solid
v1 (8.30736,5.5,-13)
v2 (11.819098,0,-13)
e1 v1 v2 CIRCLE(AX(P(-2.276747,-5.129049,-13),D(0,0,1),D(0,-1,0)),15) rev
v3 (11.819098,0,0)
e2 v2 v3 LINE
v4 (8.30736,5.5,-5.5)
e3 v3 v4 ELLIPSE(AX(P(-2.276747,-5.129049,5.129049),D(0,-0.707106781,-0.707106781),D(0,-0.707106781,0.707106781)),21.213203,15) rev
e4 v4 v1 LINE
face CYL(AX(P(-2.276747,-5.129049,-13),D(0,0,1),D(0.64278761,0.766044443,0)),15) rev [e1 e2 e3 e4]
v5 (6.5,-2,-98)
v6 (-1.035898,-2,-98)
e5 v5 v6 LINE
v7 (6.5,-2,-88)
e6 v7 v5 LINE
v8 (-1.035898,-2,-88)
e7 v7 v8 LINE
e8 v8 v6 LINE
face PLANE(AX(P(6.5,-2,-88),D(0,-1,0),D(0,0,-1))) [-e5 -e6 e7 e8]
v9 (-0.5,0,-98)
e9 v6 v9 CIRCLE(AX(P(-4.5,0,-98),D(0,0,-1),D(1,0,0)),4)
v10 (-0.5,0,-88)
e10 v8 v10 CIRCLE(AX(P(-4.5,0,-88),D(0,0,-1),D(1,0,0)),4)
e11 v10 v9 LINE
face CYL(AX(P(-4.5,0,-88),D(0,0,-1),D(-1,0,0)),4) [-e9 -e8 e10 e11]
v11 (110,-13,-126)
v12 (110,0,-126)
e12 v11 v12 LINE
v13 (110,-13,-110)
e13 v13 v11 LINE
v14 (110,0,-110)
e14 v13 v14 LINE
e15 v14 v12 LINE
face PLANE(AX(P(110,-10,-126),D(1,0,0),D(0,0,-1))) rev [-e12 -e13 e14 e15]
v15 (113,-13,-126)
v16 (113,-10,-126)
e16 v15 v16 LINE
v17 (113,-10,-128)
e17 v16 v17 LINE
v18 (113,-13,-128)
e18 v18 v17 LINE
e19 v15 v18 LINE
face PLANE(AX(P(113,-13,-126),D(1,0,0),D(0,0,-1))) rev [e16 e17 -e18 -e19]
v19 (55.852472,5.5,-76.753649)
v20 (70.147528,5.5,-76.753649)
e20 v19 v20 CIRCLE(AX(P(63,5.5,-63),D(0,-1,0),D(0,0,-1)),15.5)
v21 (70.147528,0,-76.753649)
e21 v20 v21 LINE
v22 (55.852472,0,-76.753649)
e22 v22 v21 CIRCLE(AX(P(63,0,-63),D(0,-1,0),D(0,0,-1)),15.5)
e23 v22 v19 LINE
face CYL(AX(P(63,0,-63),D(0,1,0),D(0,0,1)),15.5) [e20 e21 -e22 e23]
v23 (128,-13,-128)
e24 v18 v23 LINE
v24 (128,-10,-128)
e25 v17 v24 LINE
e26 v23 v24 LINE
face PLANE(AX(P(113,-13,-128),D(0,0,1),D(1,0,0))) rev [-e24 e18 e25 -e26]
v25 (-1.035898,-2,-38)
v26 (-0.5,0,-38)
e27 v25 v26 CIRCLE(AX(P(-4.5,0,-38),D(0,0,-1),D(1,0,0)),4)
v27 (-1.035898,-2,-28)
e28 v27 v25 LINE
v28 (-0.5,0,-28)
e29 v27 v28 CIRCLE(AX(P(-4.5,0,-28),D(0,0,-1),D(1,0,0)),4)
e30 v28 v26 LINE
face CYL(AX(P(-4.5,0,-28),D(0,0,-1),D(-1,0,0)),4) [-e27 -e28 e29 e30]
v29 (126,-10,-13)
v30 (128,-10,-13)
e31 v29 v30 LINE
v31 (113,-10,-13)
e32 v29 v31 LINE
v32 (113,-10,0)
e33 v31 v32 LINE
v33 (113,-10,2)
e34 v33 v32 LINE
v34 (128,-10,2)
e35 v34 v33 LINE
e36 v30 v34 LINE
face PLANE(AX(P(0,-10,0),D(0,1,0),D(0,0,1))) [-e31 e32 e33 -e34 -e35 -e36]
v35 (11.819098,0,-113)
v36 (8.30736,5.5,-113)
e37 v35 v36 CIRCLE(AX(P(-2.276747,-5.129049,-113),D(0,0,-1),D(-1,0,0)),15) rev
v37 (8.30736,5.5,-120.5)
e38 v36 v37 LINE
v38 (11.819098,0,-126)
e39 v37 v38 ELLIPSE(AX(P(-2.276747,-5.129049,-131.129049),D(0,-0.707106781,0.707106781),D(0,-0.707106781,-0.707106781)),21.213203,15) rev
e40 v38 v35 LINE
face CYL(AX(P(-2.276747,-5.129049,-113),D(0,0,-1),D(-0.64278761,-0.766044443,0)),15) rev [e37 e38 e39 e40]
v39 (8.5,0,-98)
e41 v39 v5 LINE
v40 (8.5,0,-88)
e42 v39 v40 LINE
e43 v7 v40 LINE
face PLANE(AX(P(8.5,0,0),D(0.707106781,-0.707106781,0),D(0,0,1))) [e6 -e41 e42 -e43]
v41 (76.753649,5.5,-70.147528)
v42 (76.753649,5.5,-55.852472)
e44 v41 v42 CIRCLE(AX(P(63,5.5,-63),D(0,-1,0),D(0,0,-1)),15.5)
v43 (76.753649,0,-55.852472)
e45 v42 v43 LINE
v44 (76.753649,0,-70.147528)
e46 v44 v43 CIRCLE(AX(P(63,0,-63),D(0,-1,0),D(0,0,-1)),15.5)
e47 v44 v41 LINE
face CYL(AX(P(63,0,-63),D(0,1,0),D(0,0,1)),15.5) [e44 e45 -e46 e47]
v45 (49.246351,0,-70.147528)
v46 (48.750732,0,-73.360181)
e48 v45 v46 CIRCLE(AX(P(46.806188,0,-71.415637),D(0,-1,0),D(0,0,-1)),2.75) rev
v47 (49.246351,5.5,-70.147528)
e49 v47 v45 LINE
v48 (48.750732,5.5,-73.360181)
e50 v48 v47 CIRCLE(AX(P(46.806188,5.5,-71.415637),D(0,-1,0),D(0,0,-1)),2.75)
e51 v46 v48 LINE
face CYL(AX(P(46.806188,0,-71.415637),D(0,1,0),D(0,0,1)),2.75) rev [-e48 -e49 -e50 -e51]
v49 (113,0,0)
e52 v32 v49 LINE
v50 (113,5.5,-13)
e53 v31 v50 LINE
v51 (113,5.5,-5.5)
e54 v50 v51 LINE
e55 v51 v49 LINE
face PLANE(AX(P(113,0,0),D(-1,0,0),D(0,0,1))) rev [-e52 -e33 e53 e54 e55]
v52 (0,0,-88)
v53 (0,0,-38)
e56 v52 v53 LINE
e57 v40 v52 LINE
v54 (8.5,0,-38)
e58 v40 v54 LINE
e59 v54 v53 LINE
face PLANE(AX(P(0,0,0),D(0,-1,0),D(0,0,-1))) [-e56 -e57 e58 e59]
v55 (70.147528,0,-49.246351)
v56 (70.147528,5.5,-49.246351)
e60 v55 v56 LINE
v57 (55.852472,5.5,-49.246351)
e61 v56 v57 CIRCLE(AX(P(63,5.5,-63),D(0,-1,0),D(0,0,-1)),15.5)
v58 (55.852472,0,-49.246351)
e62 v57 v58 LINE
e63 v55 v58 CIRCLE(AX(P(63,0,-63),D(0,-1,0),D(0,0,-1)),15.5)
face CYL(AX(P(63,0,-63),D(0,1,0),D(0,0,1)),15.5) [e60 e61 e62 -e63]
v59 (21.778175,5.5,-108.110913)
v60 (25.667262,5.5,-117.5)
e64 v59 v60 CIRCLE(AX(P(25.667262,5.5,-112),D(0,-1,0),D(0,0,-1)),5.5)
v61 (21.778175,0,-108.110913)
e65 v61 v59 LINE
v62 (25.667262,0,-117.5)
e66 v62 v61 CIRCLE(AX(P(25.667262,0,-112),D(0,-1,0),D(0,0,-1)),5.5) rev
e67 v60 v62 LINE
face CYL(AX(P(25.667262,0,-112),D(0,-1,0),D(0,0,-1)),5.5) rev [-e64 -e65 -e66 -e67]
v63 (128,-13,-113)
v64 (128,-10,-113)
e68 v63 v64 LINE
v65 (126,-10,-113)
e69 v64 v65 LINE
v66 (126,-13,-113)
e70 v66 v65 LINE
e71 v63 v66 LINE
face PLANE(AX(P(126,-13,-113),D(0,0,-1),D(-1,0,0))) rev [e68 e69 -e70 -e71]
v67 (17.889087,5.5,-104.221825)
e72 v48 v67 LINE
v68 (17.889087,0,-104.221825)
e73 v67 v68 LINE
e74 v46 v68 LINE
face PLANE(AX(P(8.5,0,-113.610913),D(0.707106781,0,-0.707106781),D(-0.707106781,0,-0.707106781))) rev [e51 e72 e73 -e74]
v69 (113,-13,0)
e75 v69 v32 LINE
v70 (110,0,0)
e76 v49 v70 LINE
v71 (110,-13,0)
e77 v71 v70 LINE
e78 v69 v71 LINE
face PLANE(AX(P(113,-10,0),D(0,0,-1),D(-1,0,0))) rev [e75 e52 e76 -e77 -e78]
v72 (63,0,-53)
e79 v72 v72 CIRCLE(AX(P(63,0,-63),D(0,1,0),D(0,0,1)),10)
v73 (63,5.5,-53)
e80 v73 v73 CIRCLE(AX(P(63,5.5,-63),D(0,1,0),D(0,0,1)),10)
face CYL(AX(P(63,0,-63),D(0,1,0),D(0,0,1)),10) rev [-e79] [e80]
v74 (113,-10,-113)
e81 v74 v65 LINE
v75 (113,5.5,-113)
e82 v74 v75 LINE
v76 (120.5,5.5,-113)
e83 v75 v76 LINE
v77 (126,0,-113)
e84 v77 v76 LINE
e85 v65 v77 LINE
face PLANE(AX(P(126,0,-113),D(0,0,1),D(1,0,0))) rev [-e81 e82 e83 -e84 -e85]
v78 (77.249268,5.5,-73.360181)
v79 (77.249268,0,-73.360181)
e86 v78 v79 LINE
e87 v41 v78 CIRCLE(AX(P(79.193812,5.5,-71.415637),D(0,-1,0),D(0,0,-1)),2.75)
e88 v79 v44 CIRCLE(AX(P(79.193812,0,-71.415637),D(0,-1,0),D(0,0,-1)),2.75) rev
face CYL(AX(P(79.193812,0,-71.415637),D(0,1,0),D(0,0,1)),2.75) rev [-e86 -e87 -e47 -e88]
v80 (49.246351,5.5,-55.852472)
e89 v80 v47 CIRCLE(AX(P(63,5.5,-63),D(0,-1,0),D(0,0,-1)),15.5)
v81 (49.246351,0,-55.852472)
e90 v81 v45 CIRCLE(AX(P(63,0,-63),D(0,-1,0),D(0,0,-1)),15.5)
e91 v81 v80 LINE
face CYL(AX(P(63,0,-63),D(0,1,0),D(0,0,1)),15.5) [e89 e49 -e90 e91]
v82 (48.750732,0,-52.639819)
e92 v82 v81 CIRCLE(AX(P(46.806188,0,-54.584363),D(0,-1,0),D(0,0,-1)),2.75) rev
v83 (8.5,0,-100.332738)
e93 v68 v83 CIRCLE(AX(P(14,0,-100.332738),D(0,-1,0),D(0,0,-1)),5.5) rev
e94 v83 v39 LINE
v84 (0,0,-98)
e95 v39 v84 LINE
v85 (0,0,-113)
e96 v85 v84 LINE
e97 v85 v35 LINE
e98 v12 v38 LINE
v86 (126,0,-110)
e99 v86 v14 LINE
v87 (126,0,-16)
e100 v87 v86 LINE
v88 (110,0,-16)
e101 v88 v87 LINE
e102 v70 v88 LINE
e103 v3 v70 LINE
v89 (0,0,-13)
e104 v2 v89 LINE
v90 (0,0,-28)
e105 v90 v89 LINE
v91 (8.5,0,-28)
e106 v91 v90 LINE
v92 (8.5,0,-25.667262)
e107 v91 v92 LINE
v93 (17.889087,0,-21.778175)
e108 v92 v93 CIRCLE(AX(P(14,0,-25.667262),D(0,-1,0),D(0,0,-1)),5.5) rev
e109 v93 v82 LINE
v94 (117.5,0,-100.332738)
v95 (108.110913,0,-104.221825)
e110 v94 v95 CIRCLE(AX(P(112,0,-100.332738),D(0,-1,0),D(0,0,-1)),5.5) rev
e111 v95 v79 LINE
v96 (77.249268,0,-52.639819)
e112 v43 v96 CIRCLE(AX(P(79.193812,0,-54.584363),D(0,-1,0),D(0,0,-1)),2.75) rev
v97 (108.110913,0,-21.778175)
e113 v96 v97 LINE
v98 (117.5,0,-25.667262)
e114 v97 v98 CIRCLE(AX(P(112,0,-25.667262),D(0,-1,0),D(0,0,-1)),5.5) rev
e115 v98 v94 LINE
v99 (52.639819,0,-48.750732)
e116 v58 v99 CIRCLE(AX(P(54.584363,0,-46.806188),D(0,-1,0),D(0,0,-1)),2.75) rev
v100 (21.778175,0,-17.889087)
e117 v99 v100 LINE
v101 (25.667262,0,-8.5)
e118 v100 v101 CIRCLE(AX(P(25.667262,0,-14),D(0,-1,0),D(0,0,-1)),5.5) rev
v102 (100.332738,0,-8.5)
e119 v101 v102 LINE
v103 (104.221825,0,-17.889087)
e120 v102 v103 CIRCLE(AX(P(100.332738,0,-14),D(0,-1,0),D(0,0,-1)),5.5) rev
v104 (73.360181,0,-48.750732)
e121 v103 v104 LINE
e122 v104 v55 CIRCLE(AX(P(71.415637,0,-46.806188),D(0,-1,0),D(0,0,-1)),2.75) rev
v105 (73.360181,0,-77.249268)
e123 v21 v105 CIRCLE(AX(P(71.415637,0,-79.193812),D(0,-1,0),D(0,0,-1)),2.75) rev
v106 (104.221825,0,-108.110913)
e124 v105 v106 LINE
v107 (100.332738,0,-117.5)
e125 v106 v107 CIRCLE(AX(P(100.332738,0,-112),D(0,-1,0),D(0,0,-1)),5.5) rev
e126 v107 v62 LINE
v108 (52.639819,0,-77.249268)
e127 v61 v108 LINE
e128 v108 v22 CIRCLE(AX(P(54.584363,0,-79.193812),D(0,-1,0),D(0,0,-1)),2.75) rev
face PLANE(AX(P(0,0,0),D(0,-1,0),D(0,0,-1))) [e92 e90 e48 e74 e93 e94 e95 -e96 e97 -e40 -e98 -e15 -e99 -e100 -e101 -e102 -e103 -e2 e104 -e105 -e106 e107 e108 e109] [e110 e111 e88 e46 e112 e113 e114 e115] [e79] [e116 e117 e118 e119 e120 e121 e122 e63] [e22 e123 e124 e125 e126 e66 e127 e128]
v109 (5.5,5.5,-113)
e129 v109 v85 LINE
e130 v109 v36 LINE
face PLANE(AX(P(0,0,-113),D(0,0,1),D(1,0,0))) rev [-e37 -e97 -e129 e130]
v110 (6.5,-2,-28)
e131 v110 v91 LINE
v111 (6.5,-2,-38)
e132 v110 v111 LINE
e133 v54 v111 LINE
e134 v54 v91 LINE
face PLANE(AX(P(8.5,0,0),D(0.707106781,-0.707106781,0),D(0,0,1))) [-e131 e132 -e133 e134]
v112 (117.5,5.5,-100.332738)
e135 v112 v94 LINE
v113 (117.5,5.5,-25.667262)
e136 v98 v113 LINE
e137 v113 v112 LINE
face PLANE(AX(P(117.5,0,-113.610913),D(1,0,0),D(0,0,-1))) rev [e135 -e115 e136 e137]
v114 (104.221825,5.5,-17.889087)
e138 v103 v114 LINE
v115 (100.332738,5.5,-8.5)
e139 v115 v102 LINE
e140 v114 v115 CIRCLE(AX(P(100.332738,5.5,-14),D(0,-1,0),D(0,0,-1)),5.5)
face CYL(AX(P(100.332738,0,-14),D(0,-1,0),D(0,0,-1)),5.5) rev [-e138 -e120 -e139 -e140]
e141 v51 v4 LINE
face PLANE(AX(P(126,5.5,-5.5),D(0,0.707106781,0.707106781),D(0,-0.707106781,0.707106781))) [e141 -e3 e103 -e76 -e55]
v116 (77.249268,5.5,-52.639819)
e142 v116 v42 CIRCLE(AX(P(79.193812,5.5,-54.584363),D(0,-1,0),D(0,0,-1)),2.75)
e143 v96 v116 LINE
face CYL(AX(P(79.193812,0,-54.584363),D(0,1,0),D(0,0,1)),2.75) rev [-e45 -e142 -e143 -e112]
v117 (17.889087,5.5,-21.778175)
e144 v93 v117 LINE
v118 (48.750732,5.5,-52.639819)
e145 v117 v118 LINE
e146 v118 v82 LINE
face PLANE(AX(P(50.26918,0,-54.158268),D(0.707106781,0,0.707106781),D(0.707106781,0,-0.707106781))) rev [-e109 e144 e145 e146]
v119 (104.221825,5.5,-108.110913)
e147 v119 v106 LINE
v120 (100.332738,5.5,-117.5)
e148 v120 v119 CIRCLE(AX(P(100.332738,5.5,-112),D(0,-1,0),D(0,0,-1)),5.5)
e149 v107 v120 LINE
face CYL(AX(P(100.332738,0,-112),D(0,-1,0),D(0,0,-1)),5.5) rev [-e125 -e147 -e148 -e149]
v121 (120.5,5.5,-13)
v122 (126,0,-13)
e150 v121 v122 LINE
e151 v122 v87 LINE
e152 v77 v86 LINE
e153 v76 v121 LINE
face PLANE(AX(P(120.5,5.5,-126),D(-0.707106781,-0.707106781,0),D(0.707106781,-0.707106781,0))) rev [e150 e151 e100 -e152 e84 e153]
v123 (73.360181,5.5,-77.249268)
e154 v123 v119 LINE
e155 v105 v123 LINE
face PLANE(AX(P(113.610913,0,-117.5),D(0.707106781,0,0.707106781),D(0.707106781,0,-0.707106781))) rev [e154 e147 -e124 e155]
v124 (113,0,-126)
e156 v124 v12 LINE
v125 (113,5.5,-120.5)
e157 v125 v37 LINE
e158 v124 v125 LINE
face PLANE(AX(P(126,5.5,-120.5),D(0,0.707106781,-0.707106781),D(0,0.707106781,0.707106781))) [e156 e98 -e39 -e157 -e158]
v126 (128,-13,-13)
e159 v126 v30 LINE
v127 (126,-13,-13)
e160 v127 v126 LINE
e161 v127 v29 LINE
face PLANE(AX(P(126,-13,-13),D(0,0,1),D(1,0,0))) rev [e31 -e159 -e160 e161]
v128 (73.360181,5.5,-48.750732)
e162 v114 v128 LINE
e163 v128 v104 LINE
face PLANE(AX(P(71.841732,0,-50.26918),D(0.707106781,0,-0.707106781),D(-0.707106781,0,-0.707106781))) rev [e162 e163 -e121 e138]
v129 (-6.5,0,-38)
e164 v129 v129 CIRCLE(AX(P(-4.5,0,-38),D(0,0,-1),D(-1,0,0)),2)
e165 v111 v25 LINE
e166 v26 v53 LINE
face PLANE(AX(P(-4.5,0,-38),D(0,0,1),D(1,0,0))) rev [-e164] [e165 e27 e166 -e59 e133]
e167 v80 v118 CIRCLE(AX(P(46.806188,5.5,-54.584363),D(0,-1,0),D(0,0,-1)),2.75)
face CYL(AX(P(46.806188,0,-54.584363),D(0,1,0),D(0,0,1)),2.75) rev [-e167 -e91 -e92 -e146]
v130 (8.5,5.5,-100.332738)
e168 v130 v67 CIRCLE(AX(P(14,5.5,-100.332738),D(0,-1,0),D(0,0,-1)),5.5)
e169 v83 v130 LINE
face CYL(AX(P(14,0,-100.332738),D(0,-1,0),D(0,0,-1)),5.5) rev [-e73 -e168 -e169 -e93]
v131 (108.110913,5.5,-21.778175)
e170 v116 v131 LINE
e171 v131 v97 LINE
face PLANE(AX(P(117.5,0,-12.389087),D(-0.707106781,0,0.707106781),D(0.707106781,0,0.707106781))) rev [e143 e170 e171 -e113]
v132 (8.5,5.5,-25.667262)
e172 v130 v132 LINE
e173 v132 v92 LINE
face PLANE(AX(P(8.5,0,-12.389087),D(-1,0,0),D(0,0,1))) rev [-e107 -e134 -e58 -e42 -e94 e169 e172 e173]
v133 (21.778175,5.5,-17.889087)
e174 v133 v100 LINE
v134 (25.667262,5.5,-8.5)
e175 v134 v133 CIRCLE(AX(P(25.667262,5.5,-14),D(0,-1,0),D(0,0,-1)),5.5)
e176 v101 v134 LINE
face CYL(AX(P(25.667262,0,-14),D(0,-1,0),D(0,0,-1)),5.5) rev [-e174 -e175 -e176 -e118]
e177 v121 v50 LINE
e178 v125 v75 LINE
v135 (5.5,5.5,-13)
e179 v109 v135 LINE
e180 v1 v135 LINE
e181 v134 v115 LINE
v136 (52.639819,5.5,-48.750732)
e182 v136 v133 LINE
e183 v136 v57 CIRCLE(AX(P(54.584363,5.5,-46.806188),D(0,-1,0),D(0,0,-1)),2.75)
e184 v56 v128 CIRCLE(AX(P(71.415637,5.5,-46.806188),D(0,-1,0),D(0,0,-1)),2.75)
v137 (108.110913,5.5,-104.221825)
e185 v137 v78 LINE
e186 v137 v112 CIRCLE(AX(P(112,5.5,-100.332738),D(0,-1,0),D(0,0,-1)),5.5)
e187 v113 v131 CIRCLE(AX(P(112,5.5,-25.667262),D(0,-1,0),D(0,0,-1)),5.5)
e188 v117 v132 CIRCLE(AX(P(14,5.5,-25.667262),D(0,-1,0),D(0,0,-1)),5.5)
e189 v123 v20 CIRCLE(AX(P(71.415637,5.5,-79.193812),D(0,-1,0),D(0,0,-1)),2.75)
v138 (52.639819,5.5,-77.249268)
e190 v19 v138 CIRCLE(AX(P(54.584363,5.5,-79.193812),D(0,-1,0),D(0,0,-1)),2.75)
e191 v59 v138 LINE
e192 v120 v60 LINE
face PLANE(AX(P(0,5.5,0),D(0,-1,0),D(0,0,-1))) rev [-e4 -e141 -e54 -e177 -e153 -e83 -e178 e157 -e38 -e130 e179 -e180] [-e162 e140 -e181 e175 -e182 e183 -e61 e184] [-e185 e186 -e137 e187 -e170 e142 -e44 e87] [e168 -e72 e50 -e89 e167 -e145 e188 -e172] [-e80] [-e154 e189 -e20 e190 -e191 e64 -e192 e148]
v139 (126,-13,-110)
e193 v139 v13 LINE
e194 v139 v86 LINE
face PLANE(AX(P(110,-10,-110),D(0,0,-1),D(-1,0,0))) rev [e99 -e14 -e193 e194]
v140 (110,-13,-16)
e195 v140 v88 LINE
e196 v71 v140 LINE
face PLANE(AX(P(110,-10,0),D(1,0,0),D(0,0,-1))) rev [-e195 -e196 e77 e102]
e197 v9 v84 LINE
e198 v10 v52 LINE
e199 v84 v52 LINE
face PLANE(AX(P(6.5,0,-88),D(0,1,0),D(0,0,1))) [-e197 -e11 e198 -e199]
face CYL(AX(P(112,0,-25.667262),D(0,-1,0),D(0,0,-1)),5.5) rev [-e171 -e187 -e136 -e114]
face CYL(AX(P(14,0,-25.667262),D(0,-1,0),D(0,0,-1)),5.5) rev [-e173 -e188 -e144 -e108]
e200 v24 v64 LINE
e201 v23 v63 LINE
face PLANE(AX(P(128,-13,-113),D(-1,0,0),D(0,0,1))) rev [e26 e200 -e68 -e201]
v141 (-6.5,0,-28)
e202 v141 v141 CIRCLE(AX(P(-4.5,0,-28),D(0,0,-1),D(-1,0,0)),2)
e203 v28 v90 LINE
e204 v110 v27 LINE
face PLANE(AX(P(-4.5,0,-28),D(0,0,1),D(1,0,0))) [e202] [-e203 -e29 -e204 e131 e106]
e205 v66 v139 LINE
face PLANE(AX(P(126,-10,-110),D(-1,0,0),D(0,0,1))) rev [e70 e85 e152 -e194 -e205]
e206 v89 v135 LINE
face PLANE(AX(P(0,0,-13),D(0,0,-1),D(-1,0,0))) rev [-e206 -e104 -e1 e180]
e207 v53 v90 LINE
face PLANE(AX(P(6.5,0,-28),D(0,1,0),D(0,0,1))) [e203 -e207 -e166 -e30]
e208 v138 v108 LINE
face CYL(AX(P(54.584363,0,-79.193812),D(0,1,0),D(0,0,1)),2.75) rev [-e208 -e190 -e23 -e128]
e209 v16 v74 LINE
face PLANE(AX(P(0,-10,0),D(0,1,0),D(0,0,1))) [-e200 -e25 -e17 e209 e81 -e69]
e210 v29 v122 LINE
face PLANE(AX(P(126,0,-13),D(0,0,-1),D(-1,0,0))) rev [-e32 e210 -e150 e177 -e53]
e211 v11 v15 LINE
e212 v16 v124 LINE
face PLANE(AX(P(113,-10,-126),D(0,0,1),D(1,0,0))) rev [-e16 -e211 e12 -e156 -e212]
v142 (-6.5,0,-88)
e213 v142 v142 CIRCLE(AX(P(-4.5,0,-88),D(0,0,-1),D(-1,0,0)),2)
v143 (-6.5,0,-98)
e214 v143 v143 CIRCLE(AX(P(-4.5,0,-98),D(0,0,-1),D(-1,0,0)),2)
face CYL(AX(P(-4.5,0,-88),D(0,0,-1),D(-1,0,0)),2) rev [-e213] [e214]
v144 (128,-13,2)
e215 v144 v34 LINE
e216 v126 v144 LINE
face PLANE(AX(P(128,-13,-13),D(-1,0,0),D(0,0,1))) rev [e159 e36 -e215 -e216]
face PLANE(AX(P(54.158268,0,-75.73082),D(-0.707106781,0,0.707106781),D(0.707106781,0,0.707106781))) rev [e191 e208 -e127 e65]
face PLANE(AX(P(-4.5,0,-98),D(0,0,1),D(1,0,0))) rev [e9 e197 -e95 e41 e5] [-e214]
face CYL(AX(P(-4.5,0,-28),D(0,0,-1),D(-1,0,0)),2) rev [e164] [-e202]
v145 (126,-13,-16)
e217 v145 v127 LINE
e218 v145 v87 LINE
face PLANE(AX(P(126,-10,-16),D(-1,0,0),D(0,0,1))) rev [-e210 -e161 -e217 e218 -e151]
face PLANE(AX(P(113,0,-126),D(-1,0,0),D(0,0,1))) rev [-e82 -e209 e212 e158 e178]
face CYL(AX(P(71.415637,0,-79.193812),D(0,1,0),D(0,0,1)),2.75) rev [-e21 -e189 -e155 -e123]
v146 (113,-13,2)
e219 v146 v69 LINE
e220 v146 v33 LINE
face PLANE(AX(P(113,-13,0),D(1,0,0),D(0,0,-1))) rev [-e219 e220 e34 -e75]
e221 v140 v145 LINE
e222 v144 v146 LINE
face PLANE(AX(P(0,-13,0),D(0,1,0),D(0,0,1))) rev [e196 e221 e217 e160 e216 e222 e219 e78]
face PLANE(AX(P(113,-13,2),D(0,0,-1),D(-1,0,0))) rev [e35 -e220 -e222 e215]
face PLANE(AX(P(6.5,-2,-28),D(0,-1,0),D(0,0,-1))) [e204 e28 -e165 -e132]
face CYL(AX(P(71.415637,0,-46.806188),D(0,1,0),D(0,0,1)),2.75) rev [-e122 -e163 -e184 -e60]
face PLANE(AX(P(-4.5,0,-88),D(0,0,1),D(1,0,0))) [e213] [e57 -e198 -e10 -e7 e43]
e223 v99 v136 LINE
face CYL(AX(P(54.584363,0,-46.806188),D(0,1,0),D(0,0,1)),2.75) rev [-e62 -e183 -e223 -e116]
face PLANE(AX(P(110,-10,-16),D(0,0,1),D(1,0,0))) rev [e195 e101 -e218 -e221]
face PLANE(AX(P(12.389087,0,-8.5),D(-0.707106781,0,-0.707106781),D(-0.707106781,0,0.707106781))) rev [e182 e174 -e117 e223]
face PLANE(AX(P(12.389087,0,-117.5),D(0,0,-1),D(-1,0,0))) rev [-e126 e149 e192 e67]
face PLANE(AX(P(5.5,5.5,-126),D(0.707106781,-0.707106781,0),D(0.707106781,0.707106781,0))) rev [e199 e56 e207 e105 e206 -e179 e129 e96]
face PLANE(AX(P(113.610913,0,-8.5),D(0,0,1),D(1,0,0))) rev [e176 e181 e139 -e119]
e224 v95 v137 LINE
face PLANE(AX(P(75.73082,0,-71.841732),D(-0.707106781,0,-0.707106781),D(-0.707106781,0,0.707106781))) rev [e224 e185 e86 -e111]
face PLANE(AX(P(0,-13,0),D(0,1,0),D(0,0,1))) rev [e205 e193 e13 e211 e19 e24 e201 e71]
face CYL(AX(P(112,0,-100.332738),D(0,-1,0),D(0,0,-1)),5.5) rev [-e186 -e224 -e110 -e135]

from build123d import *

# Parameters (mm, degrees)
SKETCH1_W              = 126
SKETCH1_H              = 126
BOSS_EXTRUDE1_DEPTH    = 5.5
CUT_EXTRUDE5_DEPTH     = 179.275769526
SKETCH8_R              = 10
CUT_EXTRUDE6_DEPTH     = 179.275769526
FILLET1_R              = 5.5
FILLET2_R              = 2.75
SKETCH11_W             = 13
SKETCH11_H             = 13
CUT_EXTRUDE7_DEPTH     = 179.275769526
BOSS_EXTRUDE8_START    = -15
SKETCH18_R             = 2
BOSS_EXTRUDE8_DEPTH    = 10
BOSS_EXTRUDE9_START    = -75
SKETCH18_2_R           = 2
BOSS_EXTRUDE9_DEPTH    = 10
BOSS_EXTRUDE10_DEPTH   = 10
BOSS_EXTRUDE11_DEPTH   = 3
BOSS_EXTRUDE12_DEPTH   = 4.692640137
BOSS_EXTRUDE12_START   = -13
BOSS_EXTRUDE12_2_DEPTH = 14
BOSS_EXTRUDE13_DEPTH   = 4.692640137
BOSS_EXTRUDE13_START   = -127
BOSS_EXTRUDE13_2_DEPTH = 14
CHAMFER1_SIZE          = 2


with BuildPart() as part:
    # Sketch1 → Boss-Extrude1 (new body)
    with BuildSketch(Plane(origin=(0, 0, 0), x_dir=(1, 0, 0), z_dir=(0, 1, 0))):
        with Locations((63, 63)):
            Rectangle(SKETCH1_W, SKETCH1_H)
    extrude(amount=BOSS_EXTRUDE1_DEPTH)

    # Sketch7 → Cut-Extrude5 (cut, through all)
    with BuildSketch(Plane.XY):
        Polygon((0, 0), (0, 5.5), (5.5, 5.5), align=None)
        Polygon((126, 0), (126, 5.5), (120.5, 5.5), align=None)
    cut_extrude5 = extrude(amount=-CUT_EXTRUDE5_DEPTH, mode=Mode.SUBTRACT)

    # Mirror1: Cut-Extrude5 across plane
    add(cut_extrude5.mirror(Plane(origin=(0, 0, 0), x_dir=(-0.7071067811865476, 0, 0.7071067811865476), z_dir=(-0.7071067811865477, 0, -0.7071067811865475))), mode=Mode.SUBTRACT)

    # Sketch8 → Cut-Extrude6 (cut, through all)
    with BuildSketch(Plane(origin=(0, 5.5, 0), x_dir=(1, 0, 0), z_dir=(0, 1, 0))):
        with Locations(Location((63, 63, 0), (0, 0, 270))):
            Circle(SKETCH8_R)
        with BuildLine():
            Line((50.269180349, 54.158267646), (8.5, 12.389087297))
            Line((8.5, 12.389087297), (8.5, 113.610912703))
            Line((8.5, 113.610912703), (50.269180349, 71.841732354))
            ThreePointArc((50.269180349, 71.841732354), (47.5, 63), (50.269180349, 54.158267646))
        make_face()
        with BuildLine():
            Line((54.158267646, 75.730819651), (12.389087297, 117.5))
            Line((12.389087297, 117.5), (113.610912703, 117.5))
            Line((113.610912703, 117.5), (71.841732354, 75.730819651))
            ThreePointArc((71.841732354, 75.730819651), (63, 78.5), (54.158267646, 75.730819651))
        make_face()
        with BuildLine():
            Line((75.730819651, 71.841732354), (117.5, 113.610912703))
            Line((117.5, 113.610912703), (117.5, 12.389087297))
            Line((117.5, 12.389087297), (75.730819651, 54.158267646))
            ThreePointArc((75.730819651, 54.158267646), (78.5, 63), (75.730819651, 71.841732354))
        make_face()
        with BuildLine():
            Line((71.841732354, 50.269180349), (113.610912703, 8.5))
            Line((113.610912703, 8.5), (12.389087297, 8.5))
            Line((12.389087297, 8.5), (54.158267646, 50.269180349))
            ThreePointArc((54.158267646, 50.269180349), (63, 47.5), (71.841732354, 50.269180349))
        make_face()
    extrude(amount=-CUT_EXTRUDE6_DEPTH, mode=Mode.SUBTRACT)

    # Fillet1
    fillet1_edges = [part.edges().sort_by_distance(p)[0] for p in [
        (113.610912703, 2.75, -8.5),
        (12.389087297, 2.75, -8.5),
        (117.5, 2.75, -113.610912703),
        (117.5, 2.75, -12.389087297),
        (12.389087297, 2.75, -117.5),
        (113.610912703, 2.75, -117.5),
        (8.5, 2.75, -12.389087297),
        (8.5, 2.75, -113.610912703),
    ]]
    fillet(fillet1_edges, radius=FILLET1_R)

    # Fillet2
    fillet2_edges = [part.edges().sort_by_distance(p)[0] for p in [
        (54.158267646, 2.75, -50.269180349),
        (71.841732354, 2.75, -50.269180349),
        (75.730819651, 2.75, -54.158267646),
        (75.730819651, 2.75, -71.841732354),
        (71.841732354, 2.75, -75.730819651),
        (54.158267646, 2.75, -75.730819651),
        (50.269180349, 2.75, -71.841732354),
        (50.269180349, 2.75, -54.158267646),
    ]]
    fillet(fillet2_edges, radius=FILLET2_R)

    # Sketch11 → Cut-Extrude7 (cut, through all)
    with BuildSketch(Plane(origin=(0, 5.5, 0), x_dir=(1, 0, 0), z_dir=(0, 1, 0))):
        with Locations((6.5, 119.5)):
            Rectangle(SKETCH11_W, SKETCH11_H)
        with Locations((119.5, 119.5)):
            Rectangle(SKETCH11_W, SKETCH11_H)
        with Locations((119.5, 6.5)):
            Rectangle(SKETCH11_W, SKETCH11_H)
        with Locations((6.5, 6.5)):
            Rectangle(SKETCH11_W, SKETCH11_H)
    extrude(amount=-CUT_EXTRUDE7_DEPTH, mode=Mode.SUBTRACT)

    # Sketch18 → Boss-Extrude8 (add)
    with BuildSketch(Plane(origin=(0, 0, -113), x_dir=(-1, 0, 0), z_dir=(0, 0, -1)).offset(BOSS_EXTRUDE8_START)):
        with BuildLine():
            Line((-6.5, 0), (0.5, 0))
            ThreePointArc((0.5, 0), (8.363703305, 1.03527618), (1.035898385, -2))
            Line((1.035898385, -2), (-6.5, -2))
            Line((-6.5, -2), (-6.5, 0))
        make_face()
        with Locations((4.5, 0)):
            Circle(SKETCH18_R, mode=Mode.SUBTRACT)
    extrude(amount=-BOSS_EXTRUDE8_DEPTH)

    # Sketch18<2> → Boss-Extrude9 (add)
    with BuildSketch(Plane(origin=(0, 0, -113), x_dir=(-1, 0, 0), z_dir=(0, 0, -1)).offset(BOSS_EXTRUDE9_START)):
        with BuildLine():
            Line((-6.5, 0), (0.5, 0))
            ThreePointArc((0.5, 0), (8.363703305, 1.03527618), (1.035898385, -2))
            Line((1.035898385, -2), (-6.5, -2))
            Line((-6.5, -2), (-6.5, 0))
        make_face()
        with Locations((4.5, 0)):
            Circle(SKETCH18_2_R, mode=Mode.SUBTRACT)
    extrude(amount=-BOSS_EXTRUDE9_DEPTH)

    # Sketch19 → Boss-Extrude10 (add)
    with BuildSketch(Plane.XZ):
        Polygon((126, -113), (113, -113), (113, -126), (110, -126), (110, -110), (126, -110), align=None)
        Polygon((126, -16), (126, -13), (113, -13), (113, 0), (110, 0), (110, -16), align=None)
    extrude(amount=BOSS_EXTRUDE10_DEPTH)

    # Sketch20 → Boss-Extrude11 (add)
    with BuildSketch(Plane.XZ.offset(10)):
        Polygon((110, -16), (126, -16), (126, -13), (128, -13), (128, 2), (113, 2), (113, 0), (110, 0), align=None)
        Polygon((126, -110), (126, -113), (128, -113), (128, -128), (113, -128), (113, -126), (110, -126), (110, -110), align=None)
    extrude(amount=BOSS_EXTRUDE11_DEPTH)

    # Boss-Extrude12: read off the stored shape, not the designer's step
    # Boss-Extrude12 outline → Boss-Extrude12 (add)
    with BuildSketch(Plane.ZY.offset(-13)):
        Polygon((-13, 5.5), (-13, 0), (0, 0), (-5.5, 5.5), align=None)
    extrude(amount=BOSS_EXTRUDE12_DEPTH)

    # Boss-Extrude12 2 outline → Boss-Extrude12 2 (cut)
    with BuildSketch(Plane.XY.offset(BOSS_EXTRUDE12_START)):
        with BuildLine():
            Line((8.307359863, 0), (11.819098493, 0))
            ThreePointArc((11.819098493, 0), (10.365939115, 2.943279669), (8.307359863, 5.5))
            Line((8.307359863, 5.5), (8.307359863, 0))
        make_face()
    extrude(amount=BOSS_EXTRUDE12_2_DEPTH, mode=Mode.SUBTRACT)

    # Boss-Extrude13: read off the stored shape, not the designer's step
    # Boss-Extrude13 outline → Boss-Extrude13 (add)
    with BuildSketch(Plane.ZY.offset(-13)):
        Polygon((-120.5, 5.5), (-126, 0), (-113, 0), (-113, 5.5), align=None)
    extrude(amount=BOSS_EXTRUDE13_DEPTH)

    # Boss-Extrude13 2 outline → Boss-Extrude13 2 (cut)
    with BuildSketch(Plane.XY.offset(BOSS_EXTRUDE13_START)):
        with BuildLine():
            ThreePointArc((11.819098492, 0), (10.365939114, 2.943279669), (8.307359863, 5.5))
            Line((8.307359863, 5.5), (8.307359863, 0))
            Line((8.307359863, 0), (11.819098492, 0))
        make_face()
    extrude(amount=BOSS_EXTRUDE13_2_DEPTH, mode=Mode.SUBTRACT)

    # Chamfer1
    chamfer1_edges = [part.edges().sort_by_distance(p)[0] for p in [
        (6.5, 0, -93),
        (6.5, 0, -33),
    ]]
    chamfer(chamfer1_edges, length=CHAMFER1_SIZE - 0.0001)  # a hair under: the kernel refuses the full size


solid = part.part
